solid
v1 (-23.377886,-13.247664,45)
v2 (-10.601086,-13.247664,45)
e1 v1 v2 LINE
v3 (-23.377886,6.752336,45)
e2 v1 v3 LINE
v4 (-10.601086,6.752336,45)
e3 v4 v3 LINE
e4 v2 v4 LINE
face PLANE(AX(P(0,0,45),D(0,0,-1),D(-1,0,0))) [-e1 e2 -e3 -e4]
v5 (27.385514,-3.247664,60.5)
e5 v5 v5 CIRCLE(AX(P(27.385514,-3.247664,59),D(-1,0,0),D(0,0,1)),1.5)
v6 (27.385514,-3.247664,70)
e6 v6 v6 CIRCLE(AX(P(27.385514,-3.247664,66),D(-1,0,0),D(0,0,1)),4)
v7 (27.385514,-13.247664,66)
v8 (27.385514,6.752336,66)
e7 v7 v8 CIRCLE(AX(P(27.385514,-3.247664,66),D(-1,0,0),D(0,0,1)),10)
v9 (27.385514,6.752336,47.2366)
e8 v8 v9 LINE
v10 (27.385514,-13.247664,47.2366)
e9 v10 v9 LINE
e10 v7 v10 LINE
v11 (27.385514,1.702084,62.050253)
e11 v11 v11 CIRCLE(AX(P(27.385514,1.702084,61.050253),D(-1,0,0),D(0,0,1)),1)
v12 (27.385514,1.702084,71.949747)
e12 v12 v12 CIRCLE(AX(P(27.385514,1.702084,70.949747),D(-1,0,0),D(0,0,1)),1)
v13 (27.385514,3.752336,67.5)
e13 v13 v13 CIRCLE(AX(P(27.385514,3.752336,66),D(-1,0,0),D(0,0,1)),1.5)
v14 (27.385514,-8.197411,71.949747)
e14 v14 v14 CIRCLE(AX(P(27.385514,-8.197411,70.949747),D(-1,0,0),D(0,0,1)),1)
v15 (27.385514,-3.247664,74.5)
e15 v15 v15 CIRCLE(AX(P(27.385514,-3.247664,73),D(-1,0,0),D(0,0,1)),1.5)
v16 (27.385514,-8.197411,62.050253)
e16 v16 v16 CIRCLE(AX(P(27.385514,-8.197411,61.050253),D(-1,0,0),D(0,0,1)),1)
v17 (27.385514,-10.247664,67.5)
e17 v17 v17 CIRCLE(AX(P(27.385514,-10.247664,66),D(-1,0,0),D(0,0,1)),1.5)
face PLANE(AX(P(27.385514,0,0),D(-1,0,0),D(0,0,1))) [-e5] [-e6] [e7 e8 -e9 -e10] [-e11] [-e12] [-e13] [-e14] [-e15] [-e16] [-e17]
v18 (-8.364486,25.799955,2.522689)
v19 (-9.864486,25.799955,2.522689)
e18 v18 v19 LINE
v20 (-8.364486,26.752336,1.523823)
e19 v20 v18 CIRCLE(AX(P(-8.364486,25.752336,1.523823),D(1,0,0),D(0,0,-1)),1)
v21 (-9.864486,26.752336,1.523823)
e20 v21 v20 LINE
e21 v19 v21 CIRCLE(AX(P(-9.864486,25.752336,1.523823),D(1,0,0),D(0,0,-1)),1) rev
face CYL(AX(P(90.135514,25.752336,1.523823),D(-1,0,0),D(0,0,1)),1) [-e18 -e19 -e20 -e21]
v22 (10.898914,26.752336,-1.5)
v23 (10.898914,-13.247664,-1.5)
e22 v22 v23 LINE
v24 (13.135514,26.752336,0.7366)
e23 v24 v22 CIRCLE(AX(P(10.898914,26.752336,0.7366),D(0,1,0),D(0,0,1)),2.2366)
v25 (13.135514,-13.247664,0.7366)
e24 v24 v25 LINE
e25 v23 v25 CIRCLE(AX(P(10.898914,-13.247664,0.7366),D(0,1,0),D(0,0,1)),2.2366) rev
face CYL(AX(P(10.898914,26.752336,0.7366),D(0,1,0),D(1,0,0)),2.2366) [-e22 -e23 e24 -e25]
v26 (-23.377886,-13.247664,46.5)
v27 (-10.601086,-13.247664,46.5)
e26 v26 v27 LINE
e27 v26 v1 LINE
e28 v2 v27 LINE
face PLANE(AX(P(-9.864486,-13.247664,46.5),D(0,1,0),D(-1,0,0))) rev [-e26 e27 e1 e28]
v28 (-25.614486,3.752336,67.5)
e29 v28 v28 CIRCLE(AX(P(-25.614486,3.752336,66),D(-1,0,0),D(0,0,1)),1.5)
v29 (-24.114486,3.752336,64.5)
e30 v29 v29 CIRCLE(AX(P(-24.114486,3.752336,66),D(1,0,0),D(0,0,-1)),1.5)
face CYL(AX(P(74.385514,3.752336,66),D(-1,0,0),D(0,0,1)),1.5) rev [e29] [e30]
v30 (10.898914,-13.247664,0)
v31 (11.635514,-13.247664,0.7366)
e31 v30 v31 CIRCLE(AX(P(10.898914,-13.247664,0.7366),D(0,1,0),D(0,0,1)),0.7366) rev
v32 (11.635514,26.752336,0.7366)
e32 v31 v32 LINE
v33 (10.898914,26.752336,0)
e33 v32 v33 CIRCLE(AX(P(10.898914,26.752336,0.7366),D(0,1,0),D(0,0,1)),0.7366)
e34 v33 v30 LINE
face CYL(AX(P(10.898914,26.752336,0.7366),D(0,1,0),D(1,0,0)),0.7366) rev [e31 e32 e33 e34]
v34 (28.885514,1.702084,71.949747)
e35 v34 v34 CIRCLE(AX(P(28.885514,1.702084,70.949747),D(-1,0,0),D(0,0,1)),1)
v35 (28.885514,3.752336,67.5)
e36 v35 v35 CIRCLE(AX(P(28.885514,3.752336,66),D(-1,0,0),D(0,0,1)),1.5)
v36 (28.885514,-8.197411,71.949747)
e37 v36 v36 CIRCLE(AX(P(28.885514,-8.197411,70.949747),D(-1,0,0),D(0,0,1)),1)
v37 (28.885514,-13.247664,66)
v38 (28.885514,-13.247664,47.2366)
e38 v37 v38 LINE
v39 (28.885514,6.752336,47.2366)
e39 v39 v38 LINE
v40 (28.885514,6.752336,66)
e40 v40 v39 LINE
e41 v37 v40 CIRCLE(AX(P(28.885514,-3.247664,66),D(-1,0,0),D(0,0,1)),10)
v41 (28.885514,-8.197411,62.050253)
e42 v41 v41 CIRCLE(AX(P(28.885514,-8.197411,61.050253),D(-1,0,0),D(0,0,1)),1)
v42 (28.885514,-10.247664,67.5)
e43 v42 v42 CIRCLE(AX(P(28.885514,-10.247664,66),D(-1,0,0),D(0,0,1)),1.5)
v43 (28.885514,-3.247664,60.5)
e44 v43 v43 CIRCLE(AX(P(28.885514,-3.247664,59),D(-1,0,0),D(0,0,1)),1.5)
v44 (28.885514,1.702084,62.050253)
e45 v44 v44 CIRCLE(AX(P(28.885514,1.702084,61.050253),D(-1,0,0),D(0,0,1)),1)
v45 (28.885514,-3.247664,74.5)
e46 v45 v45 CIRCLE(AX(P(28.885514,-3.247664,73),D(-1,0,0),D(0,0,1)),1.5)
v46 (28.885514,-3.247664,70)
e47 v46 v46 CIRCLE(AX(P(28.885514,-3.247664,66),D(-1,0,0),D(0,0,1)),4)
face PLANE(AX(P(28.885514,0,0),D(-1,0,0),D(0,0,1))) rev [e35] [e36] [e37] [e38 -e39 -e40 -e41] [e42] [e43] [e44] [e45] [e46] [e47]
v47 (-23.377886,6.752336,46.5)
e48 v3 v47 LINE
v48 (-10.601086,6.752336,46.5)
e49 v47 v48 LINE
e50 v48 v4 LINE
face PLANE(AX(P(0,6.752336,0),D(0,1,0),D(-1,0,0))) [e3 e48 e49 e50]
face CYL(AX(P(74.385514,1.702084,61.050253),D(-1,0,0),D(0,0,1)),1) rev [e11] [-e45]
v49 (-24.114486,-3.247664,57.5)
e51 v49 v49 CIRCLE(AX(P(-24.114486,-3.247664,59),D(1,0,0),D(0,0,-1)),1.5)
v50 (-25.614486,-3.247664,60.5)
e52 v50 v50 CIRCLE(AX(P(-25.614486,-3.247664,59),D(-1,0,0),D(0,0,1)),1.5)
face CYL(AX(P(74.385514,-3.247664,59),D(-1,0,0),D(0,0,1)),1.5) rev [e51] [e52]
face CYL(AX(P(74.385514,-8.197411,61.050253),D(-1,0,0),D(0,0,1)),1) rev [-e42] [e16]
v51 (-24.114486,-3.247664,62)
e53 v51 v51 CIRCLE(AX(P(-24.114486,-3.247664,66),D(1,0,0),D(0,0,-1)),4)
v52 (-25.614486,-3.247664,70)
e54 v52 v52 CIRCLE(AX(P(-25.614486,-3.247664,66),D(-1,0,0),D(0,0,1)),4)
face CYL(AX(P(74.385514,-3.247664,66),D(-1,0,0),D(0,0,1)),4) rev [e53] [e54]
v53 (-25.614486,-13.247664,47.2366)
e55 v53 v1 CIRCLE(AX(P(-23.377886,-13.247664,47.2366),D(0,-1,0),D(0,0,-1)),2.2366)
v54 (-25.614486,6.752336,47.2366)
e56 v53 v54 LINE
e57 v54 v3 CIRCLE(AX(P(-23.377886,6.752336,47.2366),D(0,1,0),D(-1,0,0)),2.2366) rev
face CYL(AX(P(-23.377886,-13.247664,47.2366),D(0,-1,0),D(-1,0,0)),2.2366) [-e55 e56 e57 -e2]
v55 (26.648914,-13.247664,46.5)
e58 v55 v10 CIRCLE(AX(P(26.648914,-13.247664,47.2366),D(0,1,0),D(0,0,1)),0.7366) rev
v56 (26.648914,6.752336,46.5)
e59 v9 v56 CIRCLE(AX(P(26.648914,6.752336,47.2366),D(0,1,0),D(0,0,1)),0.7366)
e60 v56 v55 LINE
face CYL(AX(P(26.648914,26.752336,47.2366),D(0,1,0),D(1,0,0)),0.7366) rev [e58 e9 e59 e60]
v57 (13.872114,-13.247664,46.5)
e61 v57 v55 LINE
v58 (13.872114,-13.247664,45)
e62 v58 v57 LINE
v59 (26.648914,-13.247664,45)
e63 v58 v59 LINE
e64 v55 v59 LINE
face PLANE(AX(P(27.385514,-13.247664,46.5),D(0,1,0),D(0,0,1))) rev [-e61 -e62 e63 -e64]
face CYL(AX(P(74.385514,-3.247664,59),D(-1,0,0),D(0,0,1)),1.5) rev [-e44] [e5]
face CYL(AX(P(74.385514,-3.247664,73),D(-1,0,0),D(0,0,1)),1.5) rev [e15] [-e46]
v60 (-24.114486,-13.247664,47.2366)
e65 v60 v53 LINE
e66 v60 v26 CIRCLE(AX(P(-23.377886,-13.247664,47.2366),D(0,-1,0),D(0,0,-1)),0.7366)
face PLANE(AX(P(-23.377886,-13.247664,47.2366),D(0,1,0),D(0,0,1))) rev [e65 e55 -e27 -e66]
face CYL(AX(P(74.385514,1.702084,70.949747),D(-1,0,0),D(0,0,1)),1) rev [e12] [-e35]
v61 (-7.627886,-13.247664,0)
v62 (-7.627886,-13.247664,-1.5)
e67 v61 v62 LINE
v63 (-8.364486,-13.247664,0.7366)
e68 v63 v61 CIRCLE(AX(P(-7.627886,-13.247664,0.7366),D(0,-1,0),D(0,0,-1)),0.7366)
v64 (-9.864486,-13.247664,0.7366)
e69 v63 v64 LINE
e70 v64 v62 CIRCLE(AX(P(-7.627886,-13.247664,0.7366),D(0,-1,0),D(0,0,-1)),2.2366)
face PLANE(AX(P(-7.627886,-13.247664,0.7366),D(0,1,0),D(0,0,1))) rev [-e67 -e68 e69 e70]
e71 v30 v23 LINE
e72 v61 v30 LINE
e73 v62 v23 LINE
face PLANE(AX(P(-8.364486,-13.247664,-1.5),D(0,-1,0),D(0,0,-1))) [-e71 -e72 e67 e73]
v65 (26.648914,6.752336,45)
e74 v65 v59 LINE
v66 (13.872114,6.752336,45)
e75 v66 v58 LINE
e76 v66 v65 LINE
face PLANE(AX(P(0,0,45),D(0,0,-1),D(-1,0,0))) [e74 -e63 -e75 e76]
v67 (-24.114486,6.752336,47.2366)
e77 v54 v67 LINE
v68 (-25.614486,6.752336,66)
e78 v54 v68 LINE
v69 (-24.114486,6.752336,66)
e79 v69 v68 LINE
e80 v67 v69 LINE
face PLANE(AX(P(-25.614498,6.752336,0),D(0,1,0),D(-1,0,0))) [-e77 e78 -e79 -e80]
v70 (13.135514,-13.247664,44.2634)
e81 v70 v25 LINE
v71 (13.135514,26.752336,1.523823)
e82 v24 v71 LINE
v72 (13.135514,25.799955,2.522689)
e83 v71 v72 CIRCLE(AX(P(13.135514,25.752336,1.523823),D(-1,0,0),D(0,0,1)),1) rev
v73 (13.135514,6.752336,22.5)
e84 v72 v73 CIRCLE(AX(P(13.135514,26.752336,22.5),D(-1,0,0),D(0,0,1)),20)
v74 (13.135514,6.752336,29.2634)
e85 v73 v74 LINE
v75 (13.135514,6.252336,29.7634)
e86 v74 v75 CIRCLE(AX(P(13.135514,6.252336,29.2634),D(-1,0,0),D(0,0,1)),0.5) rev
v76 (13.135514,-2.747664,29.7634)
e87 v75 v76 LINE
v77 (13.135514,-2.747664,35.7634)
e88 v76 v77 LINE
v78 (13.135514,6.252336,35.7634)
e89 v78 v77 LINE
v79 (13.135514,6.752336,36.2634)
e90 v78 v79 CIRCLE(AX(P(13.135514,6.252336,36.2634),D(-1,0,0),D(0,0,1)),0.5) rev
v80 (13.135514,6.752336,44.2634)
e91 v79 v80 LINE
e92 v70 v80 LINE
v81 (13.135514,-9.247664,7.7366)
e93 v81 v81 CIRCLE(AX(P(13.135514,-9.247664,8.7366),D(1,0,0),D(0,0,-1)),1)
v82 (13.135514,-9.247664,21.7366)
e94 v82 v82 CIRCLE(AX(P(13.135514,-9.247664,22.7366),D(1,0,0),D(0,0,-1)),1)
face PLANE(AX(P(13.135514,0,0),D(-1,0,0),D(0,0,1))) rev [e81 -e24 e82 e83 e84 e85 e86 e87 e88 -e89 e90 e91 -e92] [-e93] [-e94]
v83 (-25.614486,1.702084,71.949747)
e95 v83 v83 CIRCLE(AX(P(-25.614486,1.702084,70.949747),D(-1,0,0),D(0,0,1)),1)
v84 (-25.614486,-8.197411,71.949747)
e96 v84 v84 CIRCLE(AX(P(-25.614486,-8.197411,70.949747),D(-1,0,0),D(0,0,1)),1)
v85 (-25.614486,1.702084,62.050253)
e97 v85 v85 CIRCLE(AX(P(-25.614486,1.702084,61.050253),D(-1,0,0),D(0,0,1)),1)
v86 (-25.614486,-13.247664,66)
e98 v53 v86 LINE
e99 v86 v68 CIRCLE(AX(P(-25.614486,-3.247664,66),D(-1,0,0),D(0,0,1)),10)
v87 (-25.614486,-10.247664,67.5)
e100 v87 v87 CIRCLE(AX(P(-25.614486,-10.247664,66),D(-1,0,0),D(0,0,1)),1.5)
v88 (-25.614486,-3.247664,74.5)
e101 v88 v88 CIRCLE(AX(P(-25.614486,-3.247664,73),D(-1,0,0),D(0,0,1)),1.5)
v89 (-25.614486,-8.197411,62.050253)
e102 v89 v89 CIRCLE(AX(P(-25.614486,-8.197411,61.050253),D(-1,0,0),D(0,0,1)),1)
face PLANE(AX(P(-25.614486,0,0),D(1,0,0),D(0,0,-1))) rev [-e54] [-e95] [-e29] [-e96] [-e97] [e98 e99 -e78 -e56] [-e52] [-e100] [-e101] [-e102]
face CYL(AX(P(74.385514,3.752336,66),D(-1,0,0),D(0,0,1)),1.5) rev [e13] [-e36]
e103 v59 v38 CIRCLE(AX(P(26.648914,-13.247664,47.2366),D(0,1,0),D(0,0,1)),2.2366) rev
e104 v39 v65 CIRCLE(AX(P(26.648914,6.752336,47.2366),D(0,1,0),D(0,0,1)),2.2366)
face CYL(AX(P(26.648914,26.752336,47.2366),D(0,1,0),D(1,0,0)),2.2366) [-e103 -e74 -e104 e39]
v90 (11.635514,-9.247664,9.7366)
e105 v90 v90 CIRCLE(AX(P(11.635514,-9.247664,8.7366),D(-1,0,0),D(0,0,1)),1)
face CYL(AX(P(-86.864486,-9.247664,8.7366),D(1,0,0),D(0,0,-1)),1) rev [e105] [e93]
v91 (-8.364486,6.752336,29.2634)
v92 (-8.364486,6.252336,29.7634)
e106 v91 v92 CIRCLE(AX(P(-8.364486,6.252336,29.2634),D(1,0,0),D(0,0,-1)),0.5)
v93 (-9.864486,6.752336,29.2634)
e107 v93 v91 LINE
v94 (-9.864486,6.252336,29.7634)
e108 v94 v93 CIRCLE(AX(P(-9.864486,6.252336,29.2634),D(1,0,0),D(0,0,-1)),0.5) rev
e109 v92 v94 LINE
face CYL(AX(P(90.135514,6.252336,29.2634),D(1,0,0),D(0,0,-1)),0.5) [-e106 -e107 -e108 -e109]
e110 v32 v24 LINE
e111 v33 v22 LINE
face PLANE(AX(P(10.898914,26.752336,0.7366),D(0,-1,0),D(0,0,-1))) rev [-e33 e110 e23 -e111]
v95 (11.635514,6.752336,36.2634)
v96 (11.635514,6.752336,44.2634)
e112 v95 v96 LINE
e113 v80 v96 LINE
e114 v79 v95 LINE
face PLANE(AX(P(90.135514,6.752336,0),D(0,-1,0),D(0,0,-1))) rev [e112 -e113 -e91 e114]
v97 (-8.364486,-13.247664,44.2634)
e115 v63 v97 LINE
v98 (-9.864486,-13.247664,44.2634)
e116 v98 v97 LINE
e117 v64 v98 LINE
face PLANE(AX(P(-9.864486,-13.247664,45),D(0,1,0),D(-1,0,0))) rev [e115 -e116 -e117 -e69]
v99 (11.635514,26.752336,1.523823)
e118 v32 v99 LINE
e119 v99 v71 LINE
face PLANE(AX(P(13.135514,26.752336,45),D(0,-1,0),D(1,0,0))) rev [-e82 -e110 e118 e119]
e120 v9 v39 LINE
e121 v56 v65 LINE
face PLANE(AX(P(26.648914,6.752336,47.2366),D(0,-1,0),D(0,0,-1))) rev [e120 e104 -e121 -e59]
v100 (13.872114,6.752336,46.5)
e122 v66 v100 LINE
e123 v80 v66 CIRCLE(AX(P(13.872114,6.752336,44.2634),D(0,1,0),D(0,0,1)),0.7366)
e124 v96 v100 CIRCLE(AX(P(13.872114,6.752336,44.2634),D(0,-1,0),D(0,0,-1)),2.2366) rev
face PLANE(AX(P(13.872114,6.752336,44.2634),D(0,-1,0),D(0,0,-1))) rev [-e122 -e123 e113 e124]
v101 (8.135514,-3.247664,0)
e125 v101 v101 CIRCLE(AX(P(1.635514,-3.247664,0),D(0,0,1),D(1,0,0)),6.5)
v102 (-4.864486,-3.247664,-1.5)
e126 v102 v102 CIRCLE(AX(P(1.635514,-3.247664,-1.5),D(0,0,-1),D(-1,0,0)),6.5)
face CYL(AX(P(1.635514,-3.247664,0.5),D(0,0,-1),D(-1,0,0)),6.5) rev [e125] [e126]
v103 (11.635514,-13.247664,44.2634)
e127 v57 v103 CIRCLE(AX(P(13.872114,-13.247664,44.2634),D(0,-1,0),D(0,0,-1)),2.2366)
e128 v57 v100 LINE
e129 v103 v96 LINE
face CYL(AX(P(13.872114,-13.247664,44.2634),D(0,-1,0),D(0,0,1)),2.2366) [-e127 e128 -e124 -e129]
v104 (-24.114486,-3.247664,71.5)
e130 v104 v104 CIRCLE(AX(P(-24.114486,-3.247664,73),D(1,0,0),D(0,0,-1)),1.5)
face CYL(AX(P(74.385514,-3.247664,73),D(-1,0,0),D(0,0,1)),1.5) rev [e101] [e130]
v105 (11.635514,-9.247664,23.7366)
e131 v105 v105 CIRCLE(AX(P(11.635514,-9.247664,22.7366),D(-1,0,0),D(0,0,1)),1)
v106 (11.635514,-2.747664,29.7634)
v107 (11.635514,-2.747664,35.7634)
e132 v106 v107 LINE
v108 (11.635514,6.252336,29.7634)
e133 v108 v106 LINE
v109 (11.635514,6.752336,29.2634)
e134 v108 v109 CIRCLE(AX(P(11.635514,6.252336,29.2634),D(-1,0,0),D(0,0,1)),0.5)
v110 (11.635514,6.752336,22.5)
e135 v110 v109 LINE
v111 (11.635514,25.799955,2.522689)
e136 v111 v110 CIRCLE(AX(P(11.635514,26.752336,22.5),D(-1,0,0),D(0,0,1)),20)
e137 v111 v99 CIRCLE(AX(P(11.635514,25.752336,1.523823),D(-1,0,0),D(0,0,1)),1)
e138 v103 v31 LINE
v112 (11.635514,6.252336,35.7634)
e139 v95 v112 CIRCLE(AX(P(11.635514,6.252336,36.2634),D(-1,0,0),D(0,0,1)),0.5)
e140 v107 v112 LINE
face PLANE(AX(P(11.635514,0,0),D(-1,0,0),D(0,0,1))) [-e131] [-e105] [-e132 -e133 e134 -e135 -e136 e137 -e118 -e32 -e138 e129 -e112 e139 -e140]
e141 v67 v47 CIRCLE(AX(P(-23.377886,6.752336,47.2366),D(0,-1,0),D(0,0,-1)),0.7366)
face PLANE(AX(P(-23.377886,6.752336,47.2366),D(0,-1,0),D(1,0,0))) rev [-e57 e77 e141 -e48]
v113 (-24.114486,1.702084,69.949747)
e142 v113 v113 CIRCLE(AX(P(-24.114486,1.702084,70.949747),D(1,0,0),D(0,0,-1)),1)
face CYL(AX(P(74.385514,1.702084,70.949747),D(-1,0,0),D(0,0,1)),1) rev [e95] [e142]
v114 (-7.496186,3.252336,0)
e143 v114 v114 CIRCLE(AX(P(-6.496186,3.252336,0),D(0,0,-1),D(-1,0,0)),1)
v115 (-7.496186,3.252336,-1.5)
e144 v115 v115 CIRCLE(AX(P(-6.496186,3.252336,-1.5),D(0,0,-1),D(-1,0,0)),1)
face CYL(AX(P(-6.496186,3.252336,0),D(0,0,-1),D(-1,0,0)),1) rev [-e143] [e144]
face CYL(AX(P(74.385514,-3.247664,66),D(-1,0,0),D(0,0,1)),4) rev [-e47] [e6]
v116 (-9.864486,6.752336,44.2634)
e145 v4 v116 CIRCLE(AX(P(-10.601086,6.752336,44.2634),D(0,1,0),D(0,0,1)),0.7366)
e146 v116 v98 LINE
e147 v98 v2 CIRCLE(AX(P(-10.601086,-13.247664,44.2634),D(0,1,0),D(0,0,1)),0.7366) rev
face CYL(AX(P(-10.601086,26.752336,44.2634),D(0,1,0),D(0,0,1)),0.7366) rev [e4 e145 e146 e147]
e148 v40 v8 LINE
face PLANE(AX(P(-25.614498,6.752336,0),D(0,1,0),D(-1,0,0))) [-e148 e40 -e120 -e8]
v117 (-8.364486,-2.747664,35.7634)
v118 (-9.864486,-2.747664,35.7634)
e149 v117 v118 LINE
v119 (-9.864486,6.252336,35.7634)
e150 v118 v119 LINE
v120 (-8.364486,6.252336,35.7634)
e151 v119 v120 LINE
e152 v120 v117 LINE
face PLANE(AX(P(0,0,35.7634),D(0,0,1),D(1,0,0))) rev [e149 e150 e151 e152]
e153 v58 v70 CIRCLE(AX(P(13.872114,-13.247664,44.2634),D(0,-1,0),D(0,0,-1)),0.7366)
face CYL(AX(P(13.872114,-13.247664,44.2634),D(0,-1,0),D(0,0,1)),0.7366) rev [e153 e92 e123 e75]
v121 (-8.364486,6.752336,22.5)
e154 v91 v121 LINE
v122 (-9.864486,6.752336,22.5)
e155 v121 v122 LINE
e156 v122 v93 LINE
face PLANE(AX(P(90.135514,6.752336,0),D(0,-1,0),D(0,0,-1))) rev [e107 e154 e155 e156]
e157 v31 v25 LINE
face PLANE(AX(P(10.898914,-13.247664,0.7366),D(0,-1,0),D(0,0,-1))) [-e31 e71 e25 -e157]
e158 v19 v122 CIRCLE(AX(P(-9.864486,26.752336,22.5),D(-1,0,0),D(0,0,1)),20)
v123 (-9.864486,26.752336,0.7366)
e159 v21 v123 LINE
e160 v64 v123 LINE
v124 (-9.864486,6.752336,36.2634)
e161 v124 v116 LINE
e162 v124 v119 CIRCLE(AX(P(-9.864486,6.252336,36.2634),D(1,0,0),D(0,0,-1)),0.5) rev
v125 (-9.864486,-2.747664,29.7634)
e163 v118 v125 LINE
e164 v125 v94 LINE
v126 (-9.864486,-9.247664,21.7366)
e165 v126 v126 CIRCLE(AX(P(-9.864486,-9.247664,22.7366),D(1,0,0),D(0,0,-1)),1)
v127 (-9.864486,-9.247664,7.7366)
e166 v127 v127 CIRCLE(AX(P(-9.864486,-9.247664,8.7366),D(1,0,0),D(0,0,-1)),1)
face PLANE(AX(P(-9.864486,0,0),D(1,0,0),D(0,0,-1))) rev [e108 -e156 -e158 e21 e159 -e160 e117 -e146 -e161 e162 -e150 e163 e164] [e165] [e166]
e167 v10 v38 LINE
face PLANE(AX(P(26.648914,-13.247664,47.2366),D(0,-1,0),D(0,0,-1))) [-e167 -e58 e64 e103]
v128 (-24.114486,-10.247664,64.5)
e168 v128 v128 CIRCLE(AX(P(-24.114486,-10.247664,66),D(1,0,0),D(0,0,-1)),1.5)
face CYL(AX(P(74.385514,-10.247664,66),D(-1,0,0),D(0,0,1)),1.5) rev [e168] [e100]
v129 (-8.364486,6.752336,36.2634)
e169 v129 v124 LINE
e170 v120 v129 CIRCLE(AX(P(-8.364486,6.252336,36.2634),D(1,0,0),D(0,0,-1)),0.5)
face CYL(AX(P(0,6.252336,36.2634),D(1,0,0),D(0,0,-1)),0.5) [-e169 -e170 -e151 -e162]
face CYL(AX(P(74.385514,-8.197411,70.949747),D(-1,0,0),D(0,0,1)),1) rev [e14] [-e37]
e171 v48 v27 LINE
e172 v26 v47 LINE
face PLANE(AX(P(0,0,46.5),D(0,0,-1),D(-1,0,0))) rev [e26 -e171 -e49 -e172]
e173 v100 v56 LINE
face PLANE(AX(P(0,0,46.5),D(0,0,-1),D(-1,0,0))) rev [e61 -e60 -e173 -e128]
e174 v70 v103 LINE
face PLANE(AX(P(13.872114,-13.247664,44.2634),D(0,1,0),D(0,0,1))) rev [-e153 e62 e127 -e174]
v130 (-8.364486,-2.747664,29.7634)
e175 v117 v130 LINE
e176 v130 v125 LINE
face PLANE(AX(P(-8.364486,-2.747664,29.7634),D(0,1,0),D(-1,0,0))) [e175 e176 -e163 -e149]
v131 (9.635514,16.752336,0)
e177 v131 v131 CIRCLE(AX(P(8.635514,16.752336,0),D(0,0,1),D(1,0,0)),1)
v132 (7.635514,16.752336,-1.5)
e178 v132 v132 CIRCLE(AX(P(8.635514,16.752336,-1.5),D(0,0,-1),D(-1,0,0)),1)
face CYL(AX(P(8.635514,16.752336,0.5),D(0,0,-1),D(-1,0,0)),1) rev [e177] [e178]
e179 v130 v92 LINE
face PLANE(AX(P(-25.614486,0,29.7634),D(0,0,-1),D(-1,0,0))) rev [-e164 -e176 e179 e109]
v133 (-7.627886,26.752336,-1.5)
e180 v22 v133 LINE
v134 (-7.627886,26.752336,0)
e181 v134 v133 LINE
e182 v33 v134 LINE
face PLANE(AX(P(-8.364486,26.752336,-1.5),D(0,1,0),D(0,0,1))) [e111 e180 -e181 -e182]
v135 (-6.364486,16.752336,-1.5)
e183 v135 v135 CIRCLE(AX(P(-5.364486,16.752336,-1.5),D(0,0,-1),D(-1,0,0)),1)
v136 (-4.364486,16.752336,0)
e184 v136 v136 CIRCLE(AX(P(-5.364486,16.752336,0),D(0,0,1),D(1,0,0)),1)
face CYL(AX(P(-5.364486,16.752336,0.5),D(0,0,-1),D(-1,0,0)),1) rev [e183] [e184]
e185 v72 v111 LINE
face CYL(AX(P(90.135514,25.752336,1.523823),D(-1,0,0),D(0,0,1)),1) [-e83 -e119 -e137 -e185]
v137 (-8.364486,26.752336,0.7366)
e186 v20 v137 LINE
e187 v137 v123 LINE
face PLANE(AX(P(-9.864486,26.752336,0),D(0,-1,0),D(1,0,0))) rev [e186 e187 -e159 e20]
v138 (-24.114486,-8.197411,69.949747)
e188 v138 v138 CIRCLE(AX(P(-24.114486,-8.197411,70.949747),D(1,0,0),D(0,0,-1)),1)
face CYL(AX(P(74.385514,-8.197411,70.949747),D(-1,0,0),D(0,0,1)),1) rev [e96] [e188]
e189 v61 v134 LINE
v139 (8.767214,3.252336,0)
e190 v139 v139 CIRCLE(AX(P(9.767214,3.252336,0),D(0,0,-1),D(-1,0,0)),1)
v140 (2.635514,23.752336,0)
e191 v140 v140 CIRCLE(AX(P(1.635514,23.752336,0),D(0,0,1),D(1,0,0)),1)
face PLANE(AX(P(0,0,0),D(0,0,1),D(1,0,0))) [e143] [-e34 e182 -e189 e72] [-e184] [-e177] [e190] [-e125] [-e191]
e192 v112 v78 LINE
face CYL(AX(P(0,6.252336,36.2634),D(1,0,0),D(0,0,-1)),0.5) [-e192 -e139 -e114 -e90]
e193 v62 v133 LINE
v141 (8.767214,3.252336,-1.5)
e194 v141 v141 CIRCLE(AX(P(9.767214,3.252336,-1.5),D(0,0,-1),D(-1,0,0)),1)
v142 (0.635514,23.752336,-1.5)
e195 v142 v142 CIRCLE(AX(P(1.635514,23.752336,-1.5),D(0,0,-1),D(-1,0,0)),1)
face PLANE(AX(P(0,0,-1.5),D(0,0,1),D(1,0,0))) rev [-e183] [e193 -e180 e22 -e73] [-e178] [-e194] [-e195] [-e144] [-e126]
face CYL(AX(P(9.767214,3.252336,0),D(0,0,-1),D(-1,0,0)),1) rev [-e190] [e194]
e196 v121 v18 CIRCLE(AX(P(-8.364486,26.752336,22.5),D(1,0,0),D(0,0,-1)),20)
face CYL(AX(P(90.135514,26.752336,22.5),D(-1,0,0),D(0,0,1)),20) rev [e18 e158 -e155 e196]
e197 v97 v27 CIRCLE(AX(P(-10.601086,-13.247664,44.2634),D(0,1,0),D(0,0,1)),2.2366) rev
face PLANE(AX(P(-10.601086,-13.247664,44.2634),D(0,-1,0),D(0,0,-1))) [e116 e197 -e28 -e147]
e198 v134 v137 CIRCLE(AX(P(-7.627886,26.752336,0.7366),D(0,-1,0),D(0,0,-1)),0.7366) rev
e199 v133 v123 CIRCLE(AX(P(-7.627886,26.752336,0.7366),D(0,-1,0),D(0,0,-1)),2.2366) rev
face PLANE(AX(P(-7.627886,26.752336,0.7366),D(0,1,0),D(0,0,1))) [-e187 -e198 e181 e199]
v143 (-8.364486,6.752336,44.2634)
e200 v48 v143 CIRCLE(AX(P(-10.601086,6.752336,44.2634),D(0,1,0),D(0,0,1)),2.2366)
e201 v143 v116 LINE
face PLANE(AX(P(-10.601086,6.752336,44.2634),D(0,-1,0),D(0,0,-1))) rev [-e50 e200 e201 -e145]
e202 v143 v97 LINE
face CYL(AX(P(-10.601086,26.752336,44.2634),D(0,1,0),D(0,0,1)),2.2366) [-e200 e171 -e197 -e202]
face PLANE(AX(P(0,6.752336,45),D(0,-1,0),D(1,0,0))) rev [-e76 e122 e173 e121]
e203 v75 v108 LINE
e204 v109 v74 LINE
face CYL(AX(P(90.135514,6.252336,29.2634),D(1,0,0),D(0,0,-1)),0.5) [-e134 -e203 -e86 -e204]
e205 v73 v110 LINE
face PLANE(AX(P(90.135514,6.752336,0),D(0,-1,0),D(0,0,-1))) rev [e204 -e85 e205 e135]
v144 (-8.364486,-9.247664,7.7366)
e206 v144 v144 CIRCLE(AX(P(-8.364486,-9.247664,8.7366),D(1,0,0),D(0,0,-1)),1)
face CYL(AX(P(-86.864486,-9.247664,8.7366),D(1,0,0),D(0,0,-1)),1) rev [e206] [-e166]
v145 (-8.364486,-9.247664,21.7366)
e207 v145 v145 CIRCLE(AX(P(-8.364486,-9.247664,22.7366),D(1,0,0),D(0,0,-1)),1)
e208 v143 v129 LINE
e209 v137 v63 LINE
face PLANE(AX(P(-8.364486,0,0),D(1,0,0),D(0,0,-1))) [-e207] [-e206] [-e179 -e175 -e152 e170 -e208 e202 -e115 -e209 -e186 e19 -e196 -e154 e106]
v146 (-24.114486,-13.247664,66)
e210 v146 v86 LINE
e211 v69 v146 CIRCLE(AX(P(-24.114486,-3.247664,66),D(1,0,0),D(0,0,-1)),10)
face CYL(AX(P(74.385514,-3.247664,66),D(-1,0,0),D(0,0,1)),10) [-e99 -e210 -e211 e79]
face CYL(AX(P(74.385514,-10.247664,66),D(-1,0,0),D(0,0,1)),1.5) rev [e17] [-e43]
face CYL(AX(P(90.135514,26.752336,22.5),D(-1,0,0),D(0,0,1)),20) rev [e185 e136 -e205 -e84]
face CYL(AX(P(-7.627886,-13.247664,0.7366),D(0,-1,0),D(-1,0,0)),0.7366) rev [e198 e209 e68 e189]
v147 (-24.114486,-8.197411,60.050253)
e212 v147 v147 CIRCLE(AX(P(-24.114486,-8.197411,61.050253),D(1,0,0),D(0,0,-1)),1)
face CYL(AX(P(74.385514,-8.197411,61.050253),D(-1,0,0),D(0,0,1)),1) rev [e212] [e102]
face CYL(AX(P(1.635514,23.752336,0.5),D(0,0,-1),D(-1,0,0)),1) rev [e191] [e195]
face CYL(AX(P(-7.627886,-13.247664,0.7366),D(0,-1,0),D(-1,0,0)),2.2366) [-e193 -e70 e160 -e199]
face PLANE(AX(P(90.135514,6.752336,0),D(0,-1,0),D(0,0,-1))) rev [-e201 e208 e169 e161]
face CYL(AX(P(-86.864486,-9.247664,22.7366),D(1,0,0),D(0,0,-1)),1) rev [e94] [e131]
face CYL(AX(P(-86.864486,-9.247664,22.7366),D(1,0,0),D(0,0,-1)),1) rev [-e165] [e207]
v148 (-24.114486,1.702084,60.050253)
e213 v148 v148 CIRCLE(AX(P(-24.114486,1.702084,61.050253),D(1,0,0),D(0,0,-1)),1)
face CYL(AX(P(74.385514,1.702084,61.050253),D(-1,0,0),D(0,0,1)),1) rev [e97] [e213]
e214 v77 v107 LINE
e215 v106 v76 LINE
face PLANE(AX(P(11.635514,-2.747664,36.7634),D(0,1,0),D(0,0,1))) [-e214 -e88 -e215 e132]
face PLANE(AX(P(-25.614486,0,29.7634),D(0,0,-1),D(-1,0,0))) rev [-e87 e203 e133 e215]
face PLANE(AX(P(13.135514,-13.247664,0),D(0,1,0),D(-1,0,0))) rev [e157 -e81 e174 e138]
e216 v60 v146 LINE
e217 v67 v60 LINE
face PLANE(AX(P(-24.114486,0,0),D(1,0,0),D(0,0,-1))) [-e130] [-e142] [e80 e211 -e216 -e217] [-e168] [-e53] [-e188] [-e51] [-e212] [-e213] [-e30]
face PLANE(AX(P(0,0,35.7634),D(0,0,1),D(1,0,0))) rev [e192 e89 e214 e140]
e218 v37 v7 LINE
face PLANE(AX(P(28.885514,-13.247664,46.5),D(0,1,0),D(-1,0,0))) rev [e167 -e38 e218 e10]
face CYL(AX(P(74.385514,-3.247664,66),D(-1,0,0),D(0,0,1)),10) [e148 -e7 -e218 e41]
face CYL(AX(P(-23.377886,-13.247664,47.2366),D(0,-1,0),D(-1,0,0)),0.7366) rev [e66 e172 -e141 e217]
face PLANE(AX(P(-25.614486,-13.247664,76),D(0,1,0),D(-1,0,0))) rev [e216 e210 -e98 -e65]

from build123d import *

# Parameters (mm, degrees)
SKETCH_1_W                       = 20
SKETCH_1_H                       = 40
SM_BASE_FLANGE_1_DEPTH           = 1.5
SM_EDGE_FLANGE_1_STRIP_W         = 7.4732
SM_EDGE_FLANGE_1_STRIP_H         = 1.5
SM_EDGE_FLANGE_1_STRIP_CUT_DEPTH = 40
SM_EDGE_FLANGE_1_DEPTH           = 40
SM_EDGE_FLANGE_2_STRIP_W         = 7.4732
SM_EDGE_FLANGE_2_STRIP_H         = 1.5
SM_EDGE_FLANGE_2_STRIP_CUT_DEPTH = 40
SM_EDGE_FLANGE_2_DEPTH           = 40
SM_EDGE_FLANGE_5_STRIP_W         = 7.4732
SM_EDGE_FLANGE_5_STRIP_H         = 1.5
SM_EDGE_FLANGE_5_STRIP_CUT_DEPTH = 40
SM_EDGE_FLANGE_5_DEPTH           = 40
SM_EDGE_FLANGE_6_STRIP_W         = 7.4732
SM_EDGE_FLANGE_6_STRIP_H         = 1.5
SM_EDGE_FLANGE_6_STRIP_CUT_DEPTH = 40
SM_EDGE_FLANGE_6_DEPTH           = 40
SM_EDGE_FLANGE_7_STRIP_W         = 7.4732
SM_EDGE_FLANGE_7_STRIP_H         = 1.5
SM_EDGE_FLANGE_7_STRIP_CUT_DEPTH = 40
SM_EDGE_FLANGE_7_DEPTH           = 40
SM_EDGE_FLANGE_8_STRIP_W         = 7.4732
SM_EDGE_FLANGE_8_STRIP_H         = 1.5
SM_EDGE_FLANGE_8_STRIP_CUT_DEPTH = 40
SM_EDGE_FLANGE_8_DEPTH           = 40
CUT_EXTRUDE_2_DEPTH              = 100
CUT_EXTRUDE_3_DEPTH              = 98.272491001
CUT_EXTRUDE_3_DEPTH_BACK         = 100
SKETCH_33_W                      = 28.7634
SKETCH_33_H                      = 20
CUT_EXTRUDE_START                = 6.752336449
CUT_EXTRUDE_4_DEPTH              = 20
SKETCH_36_W                      = 12.7768
SKETCH_36_H                      = 1.5
CUT_EXTRUDE_7_DEPTH              = 20
CUT_EXTRUDE_START_2              = -20
CUT_EXTRUDE_12_DEPTH             = 20
CUT_EXTRUDE_13_DEPTH             = 20
CUT_EXTRUDE_14_DEPTH             = 20
CUT_EXTRUDE_15_DEPTH             = 20
SKETCH_47_R                      = 1
CUT_EXTRUDE_16_DEPTH             = 2
SKETCH_48_R                      = 6.5
CUT_EXTRUDE_17_DEPTH             = 2
CUT_EXTRUDE_18_DEPTH             = 100
SKETCH_50_R                      = 4
SKETCH_50_R_2                    = 1.5
SKETCH_50_R_3                    = 1
CUT_EXTRUDE_19_DEPTH             = 100
CUT_EXTRUDE_20_DEPTH             = 90.404977521
CUT_EXTRUDE_20_DEPTH_BACK        = 100
SKETCH_51_W                      = 7
SKETCH_51_H                      = 11.5
SKETCH_52_R                      = 1
CUT_EXTRUDE_21_DEPTH             = 100
SKETCH_55_W                      = 7
SKETCH_55_H                      = 2
EXTRUDE_2_DEPTH                  = 1.5
SKETCH_56_W                      = 7
SKETCH_56_H                      = 2
EXTRUDE_3_DEPTH                  = 1.5
EXTRUDE_START                    = -1.5
SKETCH_58_R                      = 1
EXTRUDE_4_DEPTH                  = 1.5
SKETCH_59_R                      = 1
EXTRUDE_5_DEPTH                  = 1.5
SKETCH_60_R                      = 1
EXTRUDE_6_DEPTH                  = 1.5
SKETCH_61_R                      = 1
EXTRUDE_7_DEPTH                  = 1.5
SKETCH_62_R                      = 1
CUT_EXTRUDE_22_DEPTH             = 100
SKETCH_65_W                      = 1.5
SKETCH_65_H                      = 9.5
EXTRUDE_9_DEPTH                  = 1
SKETCH_66_W                      = 1.5
SKETCH_66_H                      = 9.5
EXTRUDE_10_DEPTH                 = 1
FILLET_2_R                       = 1
FILLET_3_R                       = 1
FILLET_4_R                       = 0.5
FILLET_5_R                       = 0.5
FILLET_6_R                       = 0.5
FILLET_7_R                       = 0.5
SKETCH_63_R                      = 1
EXTRUDE_12_DEPTH                 = 1.5
SKETCH_64_R                      = 1
CUT_EXTRUDE_23_DEPTH             = 1.5


# Read off the part's stored shape, not the designer's step: 切除-拉伸4
# Sheet-metal steps are written as plain solids
with BuildPart() as part:
    # Sketch 1 → 基体-法兰1 (new body)
    with BuildSketch(Plane.XY):
        with Locations((1.635514019, 6.752336449)):
            Rectangle(SKETCH_1_W, SKETCH_1_H)
    extrude(amount=-SM_BASE_FLANGE_1_DEPTH)

    # 边线-法兰1 strip (across the edge) → 边线-法兰1 strip cut (cut)
    with BuildSketch(Plane(origin=(11.635514019, -13.247663551, 0), x_dir=(-1, 0, 0), z_dir=(0, 1, 0))):
        with Locations((-3, -0.75)):
            Rectangle(SM_EDGE_FLANGE_1_STRIP_W, SM_EDGE_FLANGE_1_STRIP_H)
    extrude(amount=SM_EDGE_FLANGE_1_STRIP_CUT_DEPTH, mode=Mode.SUBTRACT)

    # 边线-法兰1 section (across the edge) → 边线-法兰1 (add)
    with BuildSketch(Plane(origin=(11.635514019, -13.247663551, 0), x_dir=(-1, 0, 0), z_dir=(0, 1, 0))):
        with BuildLine():
            Line((-1.5, 0.7366), (-1.5, 45))
            Line((-1.5, 45), (0, 45))
            Line((0, 45), (0, 0.7366))
            ThreePointArc((0, 0.7366), (0.215745145, 0.215745145), (0.7366, 0))
            Line((0.7366, 0), (0.7366, -1.5))
            ThreePointArc((0.7366, -1.5), (-0.844915027, -0.844915027), (-1.5, 0.7366))
        make_face()
    extrude(amount=SM_EDGE_FLANGE_1_DEPTH)

    # 边线-法兰2 strip (across the edge) → 边线-法兰2 strip cut (cut)
    with BuildSketch(Plane(origin=(-8.364485981, 26.752336449, 0), x_dir=(1, 0, 0), z_dir=(0, -1, 0))):
        with Locations((-3, -0.75)):
            Rectangle(SM_EDGE_FLANGE_2_STRIP_W, SM_EDGE_FLANGE_2_STRIP_H)
    extrude(amount=SM_EDGE_FLANGE_2_STRIP_CUT_DEPTH, mode=Mode.SUBTRACT)

    # 边线-法兰2 section (across the edge) → 边线-法兰2 (add)
    with BuildSketch(Plane(origin=(-8.364485981, 26.752336449, 0), x_dir=(1, 0, 0), z_dir=(0, -1, 0))):
        with BuildLine():
            Line((-1.5, 0.7366), (-1.5, 45))
            Line((-1.5, 45), (0, 45))
            Line((0, 45), (0, 0.7366))
            ThreePointArc((0, 0.7366), (0.215745145, 0.215745145), (0.7366, 0))
            Line((0.7366, 0), (0.7366, -1.5))
            ThreePointArc((0.7366, -1.5), (-0.844915027, -0.844915027), (-1.5, 0.7366))
        make_face()
    extrude(amount=SM_EDGE_FLANGE_2_DEPTH)

    # 边线-法兰5 strip (across the edge) → 边线-法兰5 strip cut (cut)
    with BuildSketch(Plane(origin=(13.135514019, 26.752336449, 45), x_dir=(0, 0, -1), z_dir=(0, -1, 0))):
        with Locations((-3, -0.75)):
            Rectangle(SM_EDGE_FLANGE_5_STRIP_W, SM_EDGE_FLANGE_5_STRIP_H)
    extrude(amount=SM_EDGE_FLANGE_5_STRIP_CUT_DEPTH, mode=Mode.SUBTRACT)

    # 边线-法兰5 section (across the edge) → 边线-法兰5 (add)
    with BuildSketch(Plane(origin=(13.135514019, 26.752336449, 45), x_dir=(0, 0, -1), z_dir=(0, -1, 0))):
        with BuildLine():
            Line((-1.5, 0.7366), (-1.5, 14.25))
            Line((-1.5, 14.25), (0, 14.25))
            Line((0, 14.25), (0, 0.7366))
            ThreePointArc((0, 0.7366), (0.215745145, 0.215745145), (0.7366, 0))
            Line((0.7366, 0), (0.7366, -1.5))
            ThreePointArc((0.7366, -1.5), (-0.844915027, -0.844915027), (-1.5, 0.7366))
        make_face()
    extrude(amount=SM_EDGE_FLANGE_5_DEPTH)

    # 边线-法兰6 strip (across the edge) → 边线-法兰6 strip cut (cut)
    with BuildSketch(Plane(origin=(27.385514019, -13.247663551, 46.5), x_dir=(-1, 0, 0), z_dir=(0, 1, 0))):
        with Locations((-3, -0.75)):
            Rectangle(SM_EDGE_FLANGE_6_STRIP_W, SM_EDGE_FLANGE_6_STRIP_H)
    extrude(amount=SM_EDGE_FLANGE_6_STRIP_CUT_DEPTH, mode=Mode.SUBTRACT)

    # 边线-法兰6 section (across the edge) → 边线-法兰6 (add)
    with BuildSketch(Plane(origin=(27.385514019, -13.247663551, 46.5), x_dir=(-1, 0, 0), z_dir=(0, 1, 0))):
        with BuildLine():
            Line((-1.5, 0.7366), (-1.5, 29.5))
            Line((-1.5, 29.5), (0, 29.5))
            Line((0, 29.5), (0, 0.7366))
            ThreePointArc((0, 0.7366), (0.215745145, 0.215745145), (0.7366, 0))
            Line((0.7366, 0), (0.7366, -1.5))
            ThreePointArc((0.7366, -1.5), (-0.844915027, -0.844915027), (-1.5, 0.7366))
        make_face()
    extrude(amount=SM_EDGE_FLANGE_6_DEPTH)

    # 边线-法兰7 strip (across the edge) → 边线-法兰7 strip cut (cut)
    with BuildSketch(Plane(origin=(-9.864485981, -13.247663551, 45), x_dir=(0, 0, -1), z_dir=(0, 1, 0))):
        with Locations((-3, -0.75)):
            Rectangle(SM_EDGE_FLANGE_7_STRIP_W, SM_EDGE_FLANGE_7_STRIP_H)
    extrude(amount=SM_EDGE_FLANGE_7_STRIP_CUT_DEPTH, mode=Mode.SUBTRACT)

    # 边线-法兰7 section (across the edge) → 边线-法兰7 (add)
    with BuildSketch(Plane(origin=(-9.864485981, -13.247663551, 45), x_dir=(0, 0, -1), z_dir=(0, 1, 0))):
        with BuildLine():
            Line((-1.5, 0.7366), (-1.5, 14.25))
            Line((-1.5, 14.25), (0, 14.25))
            Line((0, 14.25), (0, 0.7366))
            ThreePointArc((0, 0.7366), (0.215745145, 0.215745145), (0.7366, 0))
            Line((0.7366, 0), (0.7366, -1.5))
            ThreePointArc((0.7366, -1.5), (-0.844915027, -0.844915027), (-1.5, 0.7366))
        make_face()
    extrude(amount=SM_EDGE_FLANGE_7_DEPTH)

    # 边线-法兰8 strip (across the edge) → 边线-法兰8 strip cut (cut)
    with BuildSketch(Plane(origin=(-24.114485981, 26.752336449, 46.5), x_dir=(1, 0, 0), z_dir=(0, -1, 0))):
        with Locations((-3, -0.75)):
            Rectangle(SM_EDGE_FLANGE_8_STRIP_W, SM_EDGE_FLANGE_8_STRIP_H)
    extrude(amount=SM_EDGE_FLANGE_8_STRIP_CUT_DEPTH, mode=Mode.SUBTRACT)

    # 边线-法兰8 section (across the edge) → 边线-法兰8 (add)
    with BuildSketch(Plane(origin=(-24.114485981, 26.752336449, 46.5), x_dir=(1, 0, 0), z_dir=(0, -1, 0))):
        with BuildLine():
            Line((-1.5, 0.7366), (-1.5, 29.5))
            Line((-1.5, 29.5), (0, 29.5))
            Line((0, 29.5), (0, 0.7366))
            ThreePointArc((0, 0.7366), (0.215745145, 0.215745145), (0.7366, 0))
            Line((0.7366, 0), (0.7366, -1.5))
            ThreePointArc((0.7366, -1.5), (-0.844915027, -0.844915027), (-1.5, 0.7366))
        make_face()
    extrude(amount=SM_EDGE_FLANGE_8_DEPTH)

    # 草图32 → 切除-拉伸2 (cut)
    with BuildSketch(Plane.ZY.offset(9.864485981)):
        with BuildLine():
            ThreePointArc((2.5, 26.752336449), (8.357864376, 12.610200825), (22.5, 6.752336449))
            ThreePointArc((22.5, 6.752336449), (36.642135624, 12.610200825), (42.5, 26.752336449))
            Line((42.5, 26.752336449), (2.5, 26.752336449))
        make_face()
        with BuildLine():
            Line((2.5, 26.752336449), (42.5, 26.752336449))
            ThreePointArc((42.5, 26.752336449), (22.5, 46.752336449), (2.5, 26.752336449))
        make_face()
        with BuildLine():
            ThreePointArc((42.5, 26.752336449), (36.642135624, 12.610200825), (22.5, 6.752336449))
            Line((22.5, 6.752336449), (44.2634, 6.752336449))
            Line((44.2634, 6.752336449), (44.2634, 26.752336449))
            Line((44.2634, 26.752336449), (42.5, 26.752336449))
        make_face()
    extrude(amount=-CUT_EXTRUDE_2_DEPTH, mode=Mode.SUBTRACT)

    # 草图33 → 切除-拉伸3 (cut, two sides: drawn at the far end of the back side and taken through both)
    with BuildSketch(Plane.ZY.offset(25.614485981).offset(-CUT_EXTRUDE_3_DEPTH_BACK)):
        with Locations((61.6183, 16.752336449)):
            Rectangle(SKETCH_33_W, SKETCH_33_H)
    extrude(amount=CUT_EXTRUDE_3_DEPTH + CUT_EXTRUDE_3_DEPTH_BACK, mode=Mode.SUBTRACT)

    # 切除-拉伸4 outline → 切除-拉伸4 (cut)
    with BuildSketch(Plane(origin=(0, 0, 0), x_dir=(1, 0, 0), z_dir=(0, 1, 0)).offset(CUT_EXTRUDE_START)):
        with BuildLine():
            ThreePointArc((-24.114485981, -47.2366), (-23.978415857, -46.810051729), (-23.620477218, -46.541093672))
            Line((-23.620477218, -46.541093672), (-24.114485981, -45.124776144))
            ThreePointArc((-24.114485981, -45.124776144), (-25.201324919, -45.941435918), (-25.614485981, -47.2366))
            Line((-25.614485981, -47.2366), (-24.114485981, -47.2366))
        make_face()
    extrude(amount=CUT_EXTRUDE_4_DEPTH, mode=Mode.SUBTRACT)

    # 草图36 → 切除-拉伸7 (cut)
    with BuildSketch(Plane(origin=(0, 26.752336449, 0), x_dir=(1, 0, 0), z_dir=(0, 1, 0))):
        with Locations((-16.989485981, -45.75)):
            Rectangle(SKETCH_36_W, SKETCH_36_H)
    extrude(amount=-CUT_EXTRUDE_7_DEPTH, mode=Mode.SUBTRACT)

    # 草图43 → 切除-拉伸12 (cut)
    with BuildSketch(Plane(origin=(0, 26.752336449, 0), x_dir=(1, 0, 0), z_dir=(0, 1, 0)).offset(CUT_EXTRUDE_START_2)):
        with BuildLine():
            Line((-8.364485981, -44.2634), (-9.864485981, -44.2634))
            ThreePointArc((-9.864485981, -44.2634), (-10.080231126, -44.784254855), (-10.601085981, -45))
            Line((-10.601085981, -45), (-10.601085981, -46.5))
            ThreePointArc((-10.601085981, -46.5), (-9.019570955, -45.844915027), (-8.364485981, -44.2634))
        make_face()
    extrude(amount=CUT_EXTRUDE_12_DEPTH, mode=Mode.SUBTRACT)

    # 草图44 → 切除-拉伸13 (cut)
    with BuildSketch(Plane(origin=(0, 26.752336449, 0), x_dir=(1, 0, 0), z_dir=(0, 1, 0))):
        with BuildLine():
            Line((-23.377885981, -46.5), (-23.377885981, -45))
            ThreePointArc((-23.377885981, -45), (-23.751432714, -45.031414657), (-24.114485981, -45.124776144))
            Line((-24.114485981, -45.124776144), (-23.620477218, -46.541093672))
            ThreePointArc((-23.620477218, -46.541093672), (-23.500909554, -46.510346077), (-23.377885981, -46.5))
        make_face()
    extrude(amount=-CUT_EXTRUDE_13_DEPTH, mode=Mode.SUBTRACT)

    # 草图45 → 切除-拉伸14 (cut)
    with BuildSketch(Plane(origin=(0, 26.752336449, 0), x_dir=(1, 0, 0), z_dir=(0, 1, 0))):
        with BuildLine():
            Line((13.135514019, -44.2634), (11.635514019, -44.2634))
            ThreePointArc((11.635514019, -44.2634), (12.290598992, -45.844915027), (13.872114019, -46.5))
            Line((13.872114019, -46.5), (13.872114019, -45))
            ThreePointArc((13.872114019, -45), (13.590229402, -44.943929664), (13.351259164, -44.784254855))
            ThreePointArc((13.351259164, -44.784254855), (13.191584355, -44.545284616), (13.135514019, -44.2634))
        make_face()
        with BuildLine():
            Line((13.872114019, -45), (13.872114019, -46.5))
            ThreePointArc((13.872114019, -46.5), (15.167278101, -46.086838938), (15.983937875, -45))
            Line((15.983937875, -45), (13.872114019, -45))
        make_face()
        with BuildLine():
            ThreePointArc((15.983937875, -45), (15.167278101, -46.086838938), (13.872114019, -46.5))
            Line((13.872114019, -46.5), (26.648914019, -46.5))
            Line((26.648914019, -46.5), (26.648914019, -46.43860075))
            Line((26.648914019, -46.43860075), (26.648914019, -45))
            Line((26.648914019, -45), (15.983937875, -45))
        make_face()
    extrude(amount=-CUT_EXTRUDE_14_DEPTH, mode=Mode.SUBTRACT)

    # 草图46 → 切除-拉伸15 (cut)
    with BuildSketch(Plane(origin=(0, 26.752336449, 0), x_dir=(1, 0, 0), z_dir=(0, 1, 0)).offset(CUT_EXTRUDE_START_2)):
        with BuildLine():
            Line((26.648914019, -45), (26.648914019, -46.5))
            ThreePointArc((26.648914019, -46.5), (27.169768874, -46.715745145), (27.385514019, -47.2366))
            Line((27.385514019, -47.2366), (28.885514019, -47.2366))
            ThreePointArc((28.885514019, -47.2366), (28.230429045, -45.655084973), (26.648914019, -45))
        make_face()
    extrude(amount=CUT_EXTRUDE_15_DEPTH, mode=Mode.SUBTRACT)

    # 草图47 → 切除-拉伸16 (cut)
    with BuildSketch(Plane(origin=(0, 0, -1.5), x_dir=(-1, 0, 0), z_dir=(0, 0, -1))):
        with Locations((-1.635514019, 23.752336449)):
            Circle(SKETCH_47_R)
        with Locations((-8.635514019, 16.752336449)):
            Circle(SKETCH_47_R)
        with Locations((5.364485981, 16.752336449)):
            Circle(SKETCH_47_R)
        with Locations((-8.635514019, 2.752336449)):
            Circle(SKETCH_47_R)
        with Locations((5.364485981, 2.752336449)):
            Circle(SKETCH_47_R)
    extrude(amount=-CUT_EXTRUDE_16_DEPTH, mode=Mode.SUBTRACT)

    # 草图48 → 切除-拉伸17 (cut)
    with BuildSketch(Plane(origin=(0, 0, -1.5), x_dir=(-1, 0, 0), z_dir=(0, 0, -1))):
        with Locations((-1.635514019, -3.247663551)):
            Circle(SKETCH_48_R)
    extrude(amount=-CUT_EXTRUDE_17_DEPTH, mode=Mode.SUBTRACT)

    # 草图49 → 切除-拉伸18 (cut)
    with BuildSketch(Plane.ZY.offset(25.614485981)):
        with BuildLine():
            ThreePointArc((66, 6.752336449), (73.071067812, 3.82340426), (76, -3.247663551))
            Line((76, -3.247663551), (76, 6.752336449))
            Line((76, 6.752336449), (66, 6.752336449))
        make_face()
        with BuildLine():
            Line((76, -13.247663551), (76, -3.247663551))
            ThreePointArc((76, -3.247663551), (73.071067812, -10.318731363), (66, -13.247663551))
            Line((66, -13.247663551), (76, -13.247663551))
        make_face()
    extrude(amount=-CUT_EXTRUDE_18_DEPTH, mode=Mode.SUBTRACT)

    # 草图50 → 切除-拉伸19 (cut)
    with BuildSketch(Plane.ZY.offset(25.614485981)):
        with Locations((66, -3.247663551)):
            Circle(SKETCH_50_R)
        with Locations((66, 3.752336449)):
            Circle(SKETCH_50_R_2)
        with Locations((70.949747468, 1.702083917)):
            Circle(SKETCH_50_R_3)
        with Locations((73, -3.247663551)):
            Circle(SKETCH_50_R_2)
        with Locations((70.949747468, -8.19741102)):
            Circle(SKETCH_50_R_3)
        with Locations((66, -10.247663551)):
            Circle(SKETCH_50_R_2)
        with Locations((61.050252532, -8.19741102)):
            Circle(SKETCH_50_R_3)
        with Locations((59, -3.247663551)):
            Circle(SKETCH_50_R_2)
        with Locations((61.050252532, 1.702083917)):
            Circle(SKETCH_50_R_3)
    extrude(amount=-CUT_EXTRUDE_19_DEPTH, mode=Mode.SUBTRACT)

    # 草图51 → 切除-拉伸20 (cut, two sides: drawn at the far end of the back side and taken through both)
    with BuildSketch(Plane.ZY.offset(9.864485981).offset(-CUT_EXTRUDE_20_DEPTH_BACK)):
        with Locations((33.2634, 1.002336449)):
            Rectangle(SKETCH_51_W, SKETCH_51_H)
    extrude(amount=CUT_EXTRUDE_20_DEPTH + CUT_EXTRUDE_20_DEPTH_BACK, mode=Mode.SUBTRACT)

    # 草图52 → 切除-拉伸21 (cut)
    with BuildSketch(Plane.ZY.offset(9.864485981)):
        with Locations((3.7366, 11.752336449)):
            Circle(SKETCH_52_R)
        with Locations((3.7366, -8.247663551)):
            Circle(SKETCH_52_R)
    extrude(amount=-CUT_EXTRUDE_21_DEPTH, mode=Mode.SUBTRACT)

    # 草图55 → 凸台-拉伸2 (add)
    with BuildSketch(Plane.ZY.offset(9.864485981)):
        with Locations((33.2634, -3.747663551)):
            Rectangle(SKETCH_55_W, SKETCH_55_H)
    extrude(amount=-EXTRUDE_2_DEPTH)

    # 草图56 → 凸台-拉伸3 (add)
    with BuildSketch(Plane(origin=(13.135514019, 0, 0), x_dir=(0, 0, -1), z_dir=(1, 0, 0))):
        with Locations((-33.2634, -3.747663551)):
            Rectangle(SKETCH_56_W, SKETCH_56_H)
    extrude(amount=-EXTRUDE_3_DEPTH)

    # 草图58 → 凸台-拉伸4 (add)
    with BuildSketch(Plane(origin=(13.135514019, 0, 0), x_dir=(0, 0, -1), z_dir=(1, 0, 0)).offset(EXTRUDE_START)):
        with Locations(Location((-3.7366, 11.752336449, 0), (0, 0, 180))):
            Circle(SKETCH_58_R)
    extrude(amount=EXTRUDE_4_DEPTH)

    # 草图59 → 凸台-拉伸5 (add)
    with BuildSketch(Plane.ZY.offset(9.864485981)):
        with Locations((3.7366, 11.752336449)):
            Circle(SKETCH_59_R)
    extrude(amount=-EXTRUDE_5_DEPTH)

    # 草图60 → 凸台-拉伸6 (add)
    with BuildSketch(Plane.ZY.offset(9.864485981)):
        with Locations((3.7366, -8.247663551)):
            Circle(SKETCH_60_R)
    extrude(amount=-EXTRUDE_6_DEPTH)

    # 草图61 → 凸台-拉伸7 (add)
    with BuildSketch(Plane(origin=(13.135514019, 0, 0), x_dir=(0, 0, -1), z_dir=(1, 0, 0)).offset(EXTRUDE_START)):
        with Locations((-3.7366, -8.247663551)):
            Circle(SKETCH_61_R)
    extrude(amount=EXTRUDE_7_DEPTH)

    # 草图62 → 切除-拉伸22 (cut)
    with BuildSketch(Plane(origin=(13.135514019, 0, 0), x_dir=(0, 0, -1), z_dir=(1, 0, 0))):
        with Locations((-22.7366, -9.247663551)):
            Circle(SKETCH_62_R)
        with Locations((-8.7366, -9.247663551)):
            Circle(SKETCH_62_R)
    extrude(amount=-CUT_EXTRUDE_22_DEPTH, mode=Mode.SUBTRACT)

    # 草图65 → 凸台-拉伸9 (add)
    with BuildSketch(Plane(origin=(0, 0, 36.7634), x_dir=(-1, 0, 0), z_dir=(0, 0, -1))):
        with Locations((-12.385514019, 2.002336449)):
            Rectangle(SKETCH_65_W, SKETCH_65_H)
    extrude(amount=EXTRUDE_9_DEPTH)

    # 草图66 → 凸台-拉伸10 (add)
    with BuildSketch(Plane(origin=(0, 0, 36.7634), x_dir=(-1, 0, 0), z_dir=(0, 0, -1))):
        with Locations((9.114485981, 2.002336449)):
            Rectangle(SKETCH_66_W, SKETCH_66_H)
    extrude(amount=EXTRUDE_10_DEPTH)

    # 圆角2
    fillet_2_edges = [part.edges().sort_by_distance(p)[0] for p in [
        (-9.114485981, 26.752336449, 2.5),
    ]]
    fillet(fillet_2_edges, radius=FILLET_2_R)

    # 圆角3
    fillet_3_edges = [part.edges().sort_by_distance(p)[0] for p in [
        (12.385514019, 26.752336449, 2.5),
    ]]
    fillet(fillet_3_edges, radius=FILLET_3_R)

    # 圆角4
    fillet_4_edges = [part.edges().sort_by_distance(p)[0] for p in [
        (-9.114485981, 6.752336449, 29.7634),
    ]]
    fillet(fillet_4_edges, radius=FILLET_4_R)

    # 圆角5
    fillet_5_edges = [part.edges().sort_by_distance(p)[0] for p in [
        (-9.114485981, 6.752336449, 35.7634),
    ]]
    fillet(fillet_5_edges, radius=FILLET_5_R)

    # 圆角6
    fillet_6_edges = [part.edges().sort_by_distance(p)[0] for p in [
        (12.385514019, 6.752336449, 29.7634),
    ]]
    fillet(fillet_6_edges, radius=FILLET_6_R)

    # 圆角7
    fillet_7_edges = [part.edges().sort_by_distance(p)[0] for p in [
        (12.385514019, 6.752336449, 35.7634),
    ]]
    fillet(fillet_7_edges, radius=FILLET_7_R)

    # 草图63 → 凸台-拉伸12 (add)
    with BuildSketch(Plane(origin=(0, 0, -1.5), x_dir=(-1, 0, 0), z_dir=(0, 0, -1))):
        with Locations((5.364485981, 2.752336449)):
            Circle(SKETCH_63_R)
        with Locations((-8.635514019, 2.752336449)):
            Circle(SKETCH_63_R)
    extrude(amount=-EXTRUDE_12_DEPTH)

    # 草图64 → 切除-拉伸23 (cut)
    with BuildSketch(Plane(origin=(0, 0, -1.5), x_dir=(-1, 0, 0), z_dir=(0, 0, -1))):
        with Locations((6.496185981, 3.252336449)):
            Circle(SKETCH_64_R)
        with Locations((-9.767214019, 3.252336449)):
            Circle(SKETCH_64_R)
    extrude(amount=-CUT_EXTRUDE_23_DEPTH, mode=Mode.SUBTRACT)


solid = part.part
